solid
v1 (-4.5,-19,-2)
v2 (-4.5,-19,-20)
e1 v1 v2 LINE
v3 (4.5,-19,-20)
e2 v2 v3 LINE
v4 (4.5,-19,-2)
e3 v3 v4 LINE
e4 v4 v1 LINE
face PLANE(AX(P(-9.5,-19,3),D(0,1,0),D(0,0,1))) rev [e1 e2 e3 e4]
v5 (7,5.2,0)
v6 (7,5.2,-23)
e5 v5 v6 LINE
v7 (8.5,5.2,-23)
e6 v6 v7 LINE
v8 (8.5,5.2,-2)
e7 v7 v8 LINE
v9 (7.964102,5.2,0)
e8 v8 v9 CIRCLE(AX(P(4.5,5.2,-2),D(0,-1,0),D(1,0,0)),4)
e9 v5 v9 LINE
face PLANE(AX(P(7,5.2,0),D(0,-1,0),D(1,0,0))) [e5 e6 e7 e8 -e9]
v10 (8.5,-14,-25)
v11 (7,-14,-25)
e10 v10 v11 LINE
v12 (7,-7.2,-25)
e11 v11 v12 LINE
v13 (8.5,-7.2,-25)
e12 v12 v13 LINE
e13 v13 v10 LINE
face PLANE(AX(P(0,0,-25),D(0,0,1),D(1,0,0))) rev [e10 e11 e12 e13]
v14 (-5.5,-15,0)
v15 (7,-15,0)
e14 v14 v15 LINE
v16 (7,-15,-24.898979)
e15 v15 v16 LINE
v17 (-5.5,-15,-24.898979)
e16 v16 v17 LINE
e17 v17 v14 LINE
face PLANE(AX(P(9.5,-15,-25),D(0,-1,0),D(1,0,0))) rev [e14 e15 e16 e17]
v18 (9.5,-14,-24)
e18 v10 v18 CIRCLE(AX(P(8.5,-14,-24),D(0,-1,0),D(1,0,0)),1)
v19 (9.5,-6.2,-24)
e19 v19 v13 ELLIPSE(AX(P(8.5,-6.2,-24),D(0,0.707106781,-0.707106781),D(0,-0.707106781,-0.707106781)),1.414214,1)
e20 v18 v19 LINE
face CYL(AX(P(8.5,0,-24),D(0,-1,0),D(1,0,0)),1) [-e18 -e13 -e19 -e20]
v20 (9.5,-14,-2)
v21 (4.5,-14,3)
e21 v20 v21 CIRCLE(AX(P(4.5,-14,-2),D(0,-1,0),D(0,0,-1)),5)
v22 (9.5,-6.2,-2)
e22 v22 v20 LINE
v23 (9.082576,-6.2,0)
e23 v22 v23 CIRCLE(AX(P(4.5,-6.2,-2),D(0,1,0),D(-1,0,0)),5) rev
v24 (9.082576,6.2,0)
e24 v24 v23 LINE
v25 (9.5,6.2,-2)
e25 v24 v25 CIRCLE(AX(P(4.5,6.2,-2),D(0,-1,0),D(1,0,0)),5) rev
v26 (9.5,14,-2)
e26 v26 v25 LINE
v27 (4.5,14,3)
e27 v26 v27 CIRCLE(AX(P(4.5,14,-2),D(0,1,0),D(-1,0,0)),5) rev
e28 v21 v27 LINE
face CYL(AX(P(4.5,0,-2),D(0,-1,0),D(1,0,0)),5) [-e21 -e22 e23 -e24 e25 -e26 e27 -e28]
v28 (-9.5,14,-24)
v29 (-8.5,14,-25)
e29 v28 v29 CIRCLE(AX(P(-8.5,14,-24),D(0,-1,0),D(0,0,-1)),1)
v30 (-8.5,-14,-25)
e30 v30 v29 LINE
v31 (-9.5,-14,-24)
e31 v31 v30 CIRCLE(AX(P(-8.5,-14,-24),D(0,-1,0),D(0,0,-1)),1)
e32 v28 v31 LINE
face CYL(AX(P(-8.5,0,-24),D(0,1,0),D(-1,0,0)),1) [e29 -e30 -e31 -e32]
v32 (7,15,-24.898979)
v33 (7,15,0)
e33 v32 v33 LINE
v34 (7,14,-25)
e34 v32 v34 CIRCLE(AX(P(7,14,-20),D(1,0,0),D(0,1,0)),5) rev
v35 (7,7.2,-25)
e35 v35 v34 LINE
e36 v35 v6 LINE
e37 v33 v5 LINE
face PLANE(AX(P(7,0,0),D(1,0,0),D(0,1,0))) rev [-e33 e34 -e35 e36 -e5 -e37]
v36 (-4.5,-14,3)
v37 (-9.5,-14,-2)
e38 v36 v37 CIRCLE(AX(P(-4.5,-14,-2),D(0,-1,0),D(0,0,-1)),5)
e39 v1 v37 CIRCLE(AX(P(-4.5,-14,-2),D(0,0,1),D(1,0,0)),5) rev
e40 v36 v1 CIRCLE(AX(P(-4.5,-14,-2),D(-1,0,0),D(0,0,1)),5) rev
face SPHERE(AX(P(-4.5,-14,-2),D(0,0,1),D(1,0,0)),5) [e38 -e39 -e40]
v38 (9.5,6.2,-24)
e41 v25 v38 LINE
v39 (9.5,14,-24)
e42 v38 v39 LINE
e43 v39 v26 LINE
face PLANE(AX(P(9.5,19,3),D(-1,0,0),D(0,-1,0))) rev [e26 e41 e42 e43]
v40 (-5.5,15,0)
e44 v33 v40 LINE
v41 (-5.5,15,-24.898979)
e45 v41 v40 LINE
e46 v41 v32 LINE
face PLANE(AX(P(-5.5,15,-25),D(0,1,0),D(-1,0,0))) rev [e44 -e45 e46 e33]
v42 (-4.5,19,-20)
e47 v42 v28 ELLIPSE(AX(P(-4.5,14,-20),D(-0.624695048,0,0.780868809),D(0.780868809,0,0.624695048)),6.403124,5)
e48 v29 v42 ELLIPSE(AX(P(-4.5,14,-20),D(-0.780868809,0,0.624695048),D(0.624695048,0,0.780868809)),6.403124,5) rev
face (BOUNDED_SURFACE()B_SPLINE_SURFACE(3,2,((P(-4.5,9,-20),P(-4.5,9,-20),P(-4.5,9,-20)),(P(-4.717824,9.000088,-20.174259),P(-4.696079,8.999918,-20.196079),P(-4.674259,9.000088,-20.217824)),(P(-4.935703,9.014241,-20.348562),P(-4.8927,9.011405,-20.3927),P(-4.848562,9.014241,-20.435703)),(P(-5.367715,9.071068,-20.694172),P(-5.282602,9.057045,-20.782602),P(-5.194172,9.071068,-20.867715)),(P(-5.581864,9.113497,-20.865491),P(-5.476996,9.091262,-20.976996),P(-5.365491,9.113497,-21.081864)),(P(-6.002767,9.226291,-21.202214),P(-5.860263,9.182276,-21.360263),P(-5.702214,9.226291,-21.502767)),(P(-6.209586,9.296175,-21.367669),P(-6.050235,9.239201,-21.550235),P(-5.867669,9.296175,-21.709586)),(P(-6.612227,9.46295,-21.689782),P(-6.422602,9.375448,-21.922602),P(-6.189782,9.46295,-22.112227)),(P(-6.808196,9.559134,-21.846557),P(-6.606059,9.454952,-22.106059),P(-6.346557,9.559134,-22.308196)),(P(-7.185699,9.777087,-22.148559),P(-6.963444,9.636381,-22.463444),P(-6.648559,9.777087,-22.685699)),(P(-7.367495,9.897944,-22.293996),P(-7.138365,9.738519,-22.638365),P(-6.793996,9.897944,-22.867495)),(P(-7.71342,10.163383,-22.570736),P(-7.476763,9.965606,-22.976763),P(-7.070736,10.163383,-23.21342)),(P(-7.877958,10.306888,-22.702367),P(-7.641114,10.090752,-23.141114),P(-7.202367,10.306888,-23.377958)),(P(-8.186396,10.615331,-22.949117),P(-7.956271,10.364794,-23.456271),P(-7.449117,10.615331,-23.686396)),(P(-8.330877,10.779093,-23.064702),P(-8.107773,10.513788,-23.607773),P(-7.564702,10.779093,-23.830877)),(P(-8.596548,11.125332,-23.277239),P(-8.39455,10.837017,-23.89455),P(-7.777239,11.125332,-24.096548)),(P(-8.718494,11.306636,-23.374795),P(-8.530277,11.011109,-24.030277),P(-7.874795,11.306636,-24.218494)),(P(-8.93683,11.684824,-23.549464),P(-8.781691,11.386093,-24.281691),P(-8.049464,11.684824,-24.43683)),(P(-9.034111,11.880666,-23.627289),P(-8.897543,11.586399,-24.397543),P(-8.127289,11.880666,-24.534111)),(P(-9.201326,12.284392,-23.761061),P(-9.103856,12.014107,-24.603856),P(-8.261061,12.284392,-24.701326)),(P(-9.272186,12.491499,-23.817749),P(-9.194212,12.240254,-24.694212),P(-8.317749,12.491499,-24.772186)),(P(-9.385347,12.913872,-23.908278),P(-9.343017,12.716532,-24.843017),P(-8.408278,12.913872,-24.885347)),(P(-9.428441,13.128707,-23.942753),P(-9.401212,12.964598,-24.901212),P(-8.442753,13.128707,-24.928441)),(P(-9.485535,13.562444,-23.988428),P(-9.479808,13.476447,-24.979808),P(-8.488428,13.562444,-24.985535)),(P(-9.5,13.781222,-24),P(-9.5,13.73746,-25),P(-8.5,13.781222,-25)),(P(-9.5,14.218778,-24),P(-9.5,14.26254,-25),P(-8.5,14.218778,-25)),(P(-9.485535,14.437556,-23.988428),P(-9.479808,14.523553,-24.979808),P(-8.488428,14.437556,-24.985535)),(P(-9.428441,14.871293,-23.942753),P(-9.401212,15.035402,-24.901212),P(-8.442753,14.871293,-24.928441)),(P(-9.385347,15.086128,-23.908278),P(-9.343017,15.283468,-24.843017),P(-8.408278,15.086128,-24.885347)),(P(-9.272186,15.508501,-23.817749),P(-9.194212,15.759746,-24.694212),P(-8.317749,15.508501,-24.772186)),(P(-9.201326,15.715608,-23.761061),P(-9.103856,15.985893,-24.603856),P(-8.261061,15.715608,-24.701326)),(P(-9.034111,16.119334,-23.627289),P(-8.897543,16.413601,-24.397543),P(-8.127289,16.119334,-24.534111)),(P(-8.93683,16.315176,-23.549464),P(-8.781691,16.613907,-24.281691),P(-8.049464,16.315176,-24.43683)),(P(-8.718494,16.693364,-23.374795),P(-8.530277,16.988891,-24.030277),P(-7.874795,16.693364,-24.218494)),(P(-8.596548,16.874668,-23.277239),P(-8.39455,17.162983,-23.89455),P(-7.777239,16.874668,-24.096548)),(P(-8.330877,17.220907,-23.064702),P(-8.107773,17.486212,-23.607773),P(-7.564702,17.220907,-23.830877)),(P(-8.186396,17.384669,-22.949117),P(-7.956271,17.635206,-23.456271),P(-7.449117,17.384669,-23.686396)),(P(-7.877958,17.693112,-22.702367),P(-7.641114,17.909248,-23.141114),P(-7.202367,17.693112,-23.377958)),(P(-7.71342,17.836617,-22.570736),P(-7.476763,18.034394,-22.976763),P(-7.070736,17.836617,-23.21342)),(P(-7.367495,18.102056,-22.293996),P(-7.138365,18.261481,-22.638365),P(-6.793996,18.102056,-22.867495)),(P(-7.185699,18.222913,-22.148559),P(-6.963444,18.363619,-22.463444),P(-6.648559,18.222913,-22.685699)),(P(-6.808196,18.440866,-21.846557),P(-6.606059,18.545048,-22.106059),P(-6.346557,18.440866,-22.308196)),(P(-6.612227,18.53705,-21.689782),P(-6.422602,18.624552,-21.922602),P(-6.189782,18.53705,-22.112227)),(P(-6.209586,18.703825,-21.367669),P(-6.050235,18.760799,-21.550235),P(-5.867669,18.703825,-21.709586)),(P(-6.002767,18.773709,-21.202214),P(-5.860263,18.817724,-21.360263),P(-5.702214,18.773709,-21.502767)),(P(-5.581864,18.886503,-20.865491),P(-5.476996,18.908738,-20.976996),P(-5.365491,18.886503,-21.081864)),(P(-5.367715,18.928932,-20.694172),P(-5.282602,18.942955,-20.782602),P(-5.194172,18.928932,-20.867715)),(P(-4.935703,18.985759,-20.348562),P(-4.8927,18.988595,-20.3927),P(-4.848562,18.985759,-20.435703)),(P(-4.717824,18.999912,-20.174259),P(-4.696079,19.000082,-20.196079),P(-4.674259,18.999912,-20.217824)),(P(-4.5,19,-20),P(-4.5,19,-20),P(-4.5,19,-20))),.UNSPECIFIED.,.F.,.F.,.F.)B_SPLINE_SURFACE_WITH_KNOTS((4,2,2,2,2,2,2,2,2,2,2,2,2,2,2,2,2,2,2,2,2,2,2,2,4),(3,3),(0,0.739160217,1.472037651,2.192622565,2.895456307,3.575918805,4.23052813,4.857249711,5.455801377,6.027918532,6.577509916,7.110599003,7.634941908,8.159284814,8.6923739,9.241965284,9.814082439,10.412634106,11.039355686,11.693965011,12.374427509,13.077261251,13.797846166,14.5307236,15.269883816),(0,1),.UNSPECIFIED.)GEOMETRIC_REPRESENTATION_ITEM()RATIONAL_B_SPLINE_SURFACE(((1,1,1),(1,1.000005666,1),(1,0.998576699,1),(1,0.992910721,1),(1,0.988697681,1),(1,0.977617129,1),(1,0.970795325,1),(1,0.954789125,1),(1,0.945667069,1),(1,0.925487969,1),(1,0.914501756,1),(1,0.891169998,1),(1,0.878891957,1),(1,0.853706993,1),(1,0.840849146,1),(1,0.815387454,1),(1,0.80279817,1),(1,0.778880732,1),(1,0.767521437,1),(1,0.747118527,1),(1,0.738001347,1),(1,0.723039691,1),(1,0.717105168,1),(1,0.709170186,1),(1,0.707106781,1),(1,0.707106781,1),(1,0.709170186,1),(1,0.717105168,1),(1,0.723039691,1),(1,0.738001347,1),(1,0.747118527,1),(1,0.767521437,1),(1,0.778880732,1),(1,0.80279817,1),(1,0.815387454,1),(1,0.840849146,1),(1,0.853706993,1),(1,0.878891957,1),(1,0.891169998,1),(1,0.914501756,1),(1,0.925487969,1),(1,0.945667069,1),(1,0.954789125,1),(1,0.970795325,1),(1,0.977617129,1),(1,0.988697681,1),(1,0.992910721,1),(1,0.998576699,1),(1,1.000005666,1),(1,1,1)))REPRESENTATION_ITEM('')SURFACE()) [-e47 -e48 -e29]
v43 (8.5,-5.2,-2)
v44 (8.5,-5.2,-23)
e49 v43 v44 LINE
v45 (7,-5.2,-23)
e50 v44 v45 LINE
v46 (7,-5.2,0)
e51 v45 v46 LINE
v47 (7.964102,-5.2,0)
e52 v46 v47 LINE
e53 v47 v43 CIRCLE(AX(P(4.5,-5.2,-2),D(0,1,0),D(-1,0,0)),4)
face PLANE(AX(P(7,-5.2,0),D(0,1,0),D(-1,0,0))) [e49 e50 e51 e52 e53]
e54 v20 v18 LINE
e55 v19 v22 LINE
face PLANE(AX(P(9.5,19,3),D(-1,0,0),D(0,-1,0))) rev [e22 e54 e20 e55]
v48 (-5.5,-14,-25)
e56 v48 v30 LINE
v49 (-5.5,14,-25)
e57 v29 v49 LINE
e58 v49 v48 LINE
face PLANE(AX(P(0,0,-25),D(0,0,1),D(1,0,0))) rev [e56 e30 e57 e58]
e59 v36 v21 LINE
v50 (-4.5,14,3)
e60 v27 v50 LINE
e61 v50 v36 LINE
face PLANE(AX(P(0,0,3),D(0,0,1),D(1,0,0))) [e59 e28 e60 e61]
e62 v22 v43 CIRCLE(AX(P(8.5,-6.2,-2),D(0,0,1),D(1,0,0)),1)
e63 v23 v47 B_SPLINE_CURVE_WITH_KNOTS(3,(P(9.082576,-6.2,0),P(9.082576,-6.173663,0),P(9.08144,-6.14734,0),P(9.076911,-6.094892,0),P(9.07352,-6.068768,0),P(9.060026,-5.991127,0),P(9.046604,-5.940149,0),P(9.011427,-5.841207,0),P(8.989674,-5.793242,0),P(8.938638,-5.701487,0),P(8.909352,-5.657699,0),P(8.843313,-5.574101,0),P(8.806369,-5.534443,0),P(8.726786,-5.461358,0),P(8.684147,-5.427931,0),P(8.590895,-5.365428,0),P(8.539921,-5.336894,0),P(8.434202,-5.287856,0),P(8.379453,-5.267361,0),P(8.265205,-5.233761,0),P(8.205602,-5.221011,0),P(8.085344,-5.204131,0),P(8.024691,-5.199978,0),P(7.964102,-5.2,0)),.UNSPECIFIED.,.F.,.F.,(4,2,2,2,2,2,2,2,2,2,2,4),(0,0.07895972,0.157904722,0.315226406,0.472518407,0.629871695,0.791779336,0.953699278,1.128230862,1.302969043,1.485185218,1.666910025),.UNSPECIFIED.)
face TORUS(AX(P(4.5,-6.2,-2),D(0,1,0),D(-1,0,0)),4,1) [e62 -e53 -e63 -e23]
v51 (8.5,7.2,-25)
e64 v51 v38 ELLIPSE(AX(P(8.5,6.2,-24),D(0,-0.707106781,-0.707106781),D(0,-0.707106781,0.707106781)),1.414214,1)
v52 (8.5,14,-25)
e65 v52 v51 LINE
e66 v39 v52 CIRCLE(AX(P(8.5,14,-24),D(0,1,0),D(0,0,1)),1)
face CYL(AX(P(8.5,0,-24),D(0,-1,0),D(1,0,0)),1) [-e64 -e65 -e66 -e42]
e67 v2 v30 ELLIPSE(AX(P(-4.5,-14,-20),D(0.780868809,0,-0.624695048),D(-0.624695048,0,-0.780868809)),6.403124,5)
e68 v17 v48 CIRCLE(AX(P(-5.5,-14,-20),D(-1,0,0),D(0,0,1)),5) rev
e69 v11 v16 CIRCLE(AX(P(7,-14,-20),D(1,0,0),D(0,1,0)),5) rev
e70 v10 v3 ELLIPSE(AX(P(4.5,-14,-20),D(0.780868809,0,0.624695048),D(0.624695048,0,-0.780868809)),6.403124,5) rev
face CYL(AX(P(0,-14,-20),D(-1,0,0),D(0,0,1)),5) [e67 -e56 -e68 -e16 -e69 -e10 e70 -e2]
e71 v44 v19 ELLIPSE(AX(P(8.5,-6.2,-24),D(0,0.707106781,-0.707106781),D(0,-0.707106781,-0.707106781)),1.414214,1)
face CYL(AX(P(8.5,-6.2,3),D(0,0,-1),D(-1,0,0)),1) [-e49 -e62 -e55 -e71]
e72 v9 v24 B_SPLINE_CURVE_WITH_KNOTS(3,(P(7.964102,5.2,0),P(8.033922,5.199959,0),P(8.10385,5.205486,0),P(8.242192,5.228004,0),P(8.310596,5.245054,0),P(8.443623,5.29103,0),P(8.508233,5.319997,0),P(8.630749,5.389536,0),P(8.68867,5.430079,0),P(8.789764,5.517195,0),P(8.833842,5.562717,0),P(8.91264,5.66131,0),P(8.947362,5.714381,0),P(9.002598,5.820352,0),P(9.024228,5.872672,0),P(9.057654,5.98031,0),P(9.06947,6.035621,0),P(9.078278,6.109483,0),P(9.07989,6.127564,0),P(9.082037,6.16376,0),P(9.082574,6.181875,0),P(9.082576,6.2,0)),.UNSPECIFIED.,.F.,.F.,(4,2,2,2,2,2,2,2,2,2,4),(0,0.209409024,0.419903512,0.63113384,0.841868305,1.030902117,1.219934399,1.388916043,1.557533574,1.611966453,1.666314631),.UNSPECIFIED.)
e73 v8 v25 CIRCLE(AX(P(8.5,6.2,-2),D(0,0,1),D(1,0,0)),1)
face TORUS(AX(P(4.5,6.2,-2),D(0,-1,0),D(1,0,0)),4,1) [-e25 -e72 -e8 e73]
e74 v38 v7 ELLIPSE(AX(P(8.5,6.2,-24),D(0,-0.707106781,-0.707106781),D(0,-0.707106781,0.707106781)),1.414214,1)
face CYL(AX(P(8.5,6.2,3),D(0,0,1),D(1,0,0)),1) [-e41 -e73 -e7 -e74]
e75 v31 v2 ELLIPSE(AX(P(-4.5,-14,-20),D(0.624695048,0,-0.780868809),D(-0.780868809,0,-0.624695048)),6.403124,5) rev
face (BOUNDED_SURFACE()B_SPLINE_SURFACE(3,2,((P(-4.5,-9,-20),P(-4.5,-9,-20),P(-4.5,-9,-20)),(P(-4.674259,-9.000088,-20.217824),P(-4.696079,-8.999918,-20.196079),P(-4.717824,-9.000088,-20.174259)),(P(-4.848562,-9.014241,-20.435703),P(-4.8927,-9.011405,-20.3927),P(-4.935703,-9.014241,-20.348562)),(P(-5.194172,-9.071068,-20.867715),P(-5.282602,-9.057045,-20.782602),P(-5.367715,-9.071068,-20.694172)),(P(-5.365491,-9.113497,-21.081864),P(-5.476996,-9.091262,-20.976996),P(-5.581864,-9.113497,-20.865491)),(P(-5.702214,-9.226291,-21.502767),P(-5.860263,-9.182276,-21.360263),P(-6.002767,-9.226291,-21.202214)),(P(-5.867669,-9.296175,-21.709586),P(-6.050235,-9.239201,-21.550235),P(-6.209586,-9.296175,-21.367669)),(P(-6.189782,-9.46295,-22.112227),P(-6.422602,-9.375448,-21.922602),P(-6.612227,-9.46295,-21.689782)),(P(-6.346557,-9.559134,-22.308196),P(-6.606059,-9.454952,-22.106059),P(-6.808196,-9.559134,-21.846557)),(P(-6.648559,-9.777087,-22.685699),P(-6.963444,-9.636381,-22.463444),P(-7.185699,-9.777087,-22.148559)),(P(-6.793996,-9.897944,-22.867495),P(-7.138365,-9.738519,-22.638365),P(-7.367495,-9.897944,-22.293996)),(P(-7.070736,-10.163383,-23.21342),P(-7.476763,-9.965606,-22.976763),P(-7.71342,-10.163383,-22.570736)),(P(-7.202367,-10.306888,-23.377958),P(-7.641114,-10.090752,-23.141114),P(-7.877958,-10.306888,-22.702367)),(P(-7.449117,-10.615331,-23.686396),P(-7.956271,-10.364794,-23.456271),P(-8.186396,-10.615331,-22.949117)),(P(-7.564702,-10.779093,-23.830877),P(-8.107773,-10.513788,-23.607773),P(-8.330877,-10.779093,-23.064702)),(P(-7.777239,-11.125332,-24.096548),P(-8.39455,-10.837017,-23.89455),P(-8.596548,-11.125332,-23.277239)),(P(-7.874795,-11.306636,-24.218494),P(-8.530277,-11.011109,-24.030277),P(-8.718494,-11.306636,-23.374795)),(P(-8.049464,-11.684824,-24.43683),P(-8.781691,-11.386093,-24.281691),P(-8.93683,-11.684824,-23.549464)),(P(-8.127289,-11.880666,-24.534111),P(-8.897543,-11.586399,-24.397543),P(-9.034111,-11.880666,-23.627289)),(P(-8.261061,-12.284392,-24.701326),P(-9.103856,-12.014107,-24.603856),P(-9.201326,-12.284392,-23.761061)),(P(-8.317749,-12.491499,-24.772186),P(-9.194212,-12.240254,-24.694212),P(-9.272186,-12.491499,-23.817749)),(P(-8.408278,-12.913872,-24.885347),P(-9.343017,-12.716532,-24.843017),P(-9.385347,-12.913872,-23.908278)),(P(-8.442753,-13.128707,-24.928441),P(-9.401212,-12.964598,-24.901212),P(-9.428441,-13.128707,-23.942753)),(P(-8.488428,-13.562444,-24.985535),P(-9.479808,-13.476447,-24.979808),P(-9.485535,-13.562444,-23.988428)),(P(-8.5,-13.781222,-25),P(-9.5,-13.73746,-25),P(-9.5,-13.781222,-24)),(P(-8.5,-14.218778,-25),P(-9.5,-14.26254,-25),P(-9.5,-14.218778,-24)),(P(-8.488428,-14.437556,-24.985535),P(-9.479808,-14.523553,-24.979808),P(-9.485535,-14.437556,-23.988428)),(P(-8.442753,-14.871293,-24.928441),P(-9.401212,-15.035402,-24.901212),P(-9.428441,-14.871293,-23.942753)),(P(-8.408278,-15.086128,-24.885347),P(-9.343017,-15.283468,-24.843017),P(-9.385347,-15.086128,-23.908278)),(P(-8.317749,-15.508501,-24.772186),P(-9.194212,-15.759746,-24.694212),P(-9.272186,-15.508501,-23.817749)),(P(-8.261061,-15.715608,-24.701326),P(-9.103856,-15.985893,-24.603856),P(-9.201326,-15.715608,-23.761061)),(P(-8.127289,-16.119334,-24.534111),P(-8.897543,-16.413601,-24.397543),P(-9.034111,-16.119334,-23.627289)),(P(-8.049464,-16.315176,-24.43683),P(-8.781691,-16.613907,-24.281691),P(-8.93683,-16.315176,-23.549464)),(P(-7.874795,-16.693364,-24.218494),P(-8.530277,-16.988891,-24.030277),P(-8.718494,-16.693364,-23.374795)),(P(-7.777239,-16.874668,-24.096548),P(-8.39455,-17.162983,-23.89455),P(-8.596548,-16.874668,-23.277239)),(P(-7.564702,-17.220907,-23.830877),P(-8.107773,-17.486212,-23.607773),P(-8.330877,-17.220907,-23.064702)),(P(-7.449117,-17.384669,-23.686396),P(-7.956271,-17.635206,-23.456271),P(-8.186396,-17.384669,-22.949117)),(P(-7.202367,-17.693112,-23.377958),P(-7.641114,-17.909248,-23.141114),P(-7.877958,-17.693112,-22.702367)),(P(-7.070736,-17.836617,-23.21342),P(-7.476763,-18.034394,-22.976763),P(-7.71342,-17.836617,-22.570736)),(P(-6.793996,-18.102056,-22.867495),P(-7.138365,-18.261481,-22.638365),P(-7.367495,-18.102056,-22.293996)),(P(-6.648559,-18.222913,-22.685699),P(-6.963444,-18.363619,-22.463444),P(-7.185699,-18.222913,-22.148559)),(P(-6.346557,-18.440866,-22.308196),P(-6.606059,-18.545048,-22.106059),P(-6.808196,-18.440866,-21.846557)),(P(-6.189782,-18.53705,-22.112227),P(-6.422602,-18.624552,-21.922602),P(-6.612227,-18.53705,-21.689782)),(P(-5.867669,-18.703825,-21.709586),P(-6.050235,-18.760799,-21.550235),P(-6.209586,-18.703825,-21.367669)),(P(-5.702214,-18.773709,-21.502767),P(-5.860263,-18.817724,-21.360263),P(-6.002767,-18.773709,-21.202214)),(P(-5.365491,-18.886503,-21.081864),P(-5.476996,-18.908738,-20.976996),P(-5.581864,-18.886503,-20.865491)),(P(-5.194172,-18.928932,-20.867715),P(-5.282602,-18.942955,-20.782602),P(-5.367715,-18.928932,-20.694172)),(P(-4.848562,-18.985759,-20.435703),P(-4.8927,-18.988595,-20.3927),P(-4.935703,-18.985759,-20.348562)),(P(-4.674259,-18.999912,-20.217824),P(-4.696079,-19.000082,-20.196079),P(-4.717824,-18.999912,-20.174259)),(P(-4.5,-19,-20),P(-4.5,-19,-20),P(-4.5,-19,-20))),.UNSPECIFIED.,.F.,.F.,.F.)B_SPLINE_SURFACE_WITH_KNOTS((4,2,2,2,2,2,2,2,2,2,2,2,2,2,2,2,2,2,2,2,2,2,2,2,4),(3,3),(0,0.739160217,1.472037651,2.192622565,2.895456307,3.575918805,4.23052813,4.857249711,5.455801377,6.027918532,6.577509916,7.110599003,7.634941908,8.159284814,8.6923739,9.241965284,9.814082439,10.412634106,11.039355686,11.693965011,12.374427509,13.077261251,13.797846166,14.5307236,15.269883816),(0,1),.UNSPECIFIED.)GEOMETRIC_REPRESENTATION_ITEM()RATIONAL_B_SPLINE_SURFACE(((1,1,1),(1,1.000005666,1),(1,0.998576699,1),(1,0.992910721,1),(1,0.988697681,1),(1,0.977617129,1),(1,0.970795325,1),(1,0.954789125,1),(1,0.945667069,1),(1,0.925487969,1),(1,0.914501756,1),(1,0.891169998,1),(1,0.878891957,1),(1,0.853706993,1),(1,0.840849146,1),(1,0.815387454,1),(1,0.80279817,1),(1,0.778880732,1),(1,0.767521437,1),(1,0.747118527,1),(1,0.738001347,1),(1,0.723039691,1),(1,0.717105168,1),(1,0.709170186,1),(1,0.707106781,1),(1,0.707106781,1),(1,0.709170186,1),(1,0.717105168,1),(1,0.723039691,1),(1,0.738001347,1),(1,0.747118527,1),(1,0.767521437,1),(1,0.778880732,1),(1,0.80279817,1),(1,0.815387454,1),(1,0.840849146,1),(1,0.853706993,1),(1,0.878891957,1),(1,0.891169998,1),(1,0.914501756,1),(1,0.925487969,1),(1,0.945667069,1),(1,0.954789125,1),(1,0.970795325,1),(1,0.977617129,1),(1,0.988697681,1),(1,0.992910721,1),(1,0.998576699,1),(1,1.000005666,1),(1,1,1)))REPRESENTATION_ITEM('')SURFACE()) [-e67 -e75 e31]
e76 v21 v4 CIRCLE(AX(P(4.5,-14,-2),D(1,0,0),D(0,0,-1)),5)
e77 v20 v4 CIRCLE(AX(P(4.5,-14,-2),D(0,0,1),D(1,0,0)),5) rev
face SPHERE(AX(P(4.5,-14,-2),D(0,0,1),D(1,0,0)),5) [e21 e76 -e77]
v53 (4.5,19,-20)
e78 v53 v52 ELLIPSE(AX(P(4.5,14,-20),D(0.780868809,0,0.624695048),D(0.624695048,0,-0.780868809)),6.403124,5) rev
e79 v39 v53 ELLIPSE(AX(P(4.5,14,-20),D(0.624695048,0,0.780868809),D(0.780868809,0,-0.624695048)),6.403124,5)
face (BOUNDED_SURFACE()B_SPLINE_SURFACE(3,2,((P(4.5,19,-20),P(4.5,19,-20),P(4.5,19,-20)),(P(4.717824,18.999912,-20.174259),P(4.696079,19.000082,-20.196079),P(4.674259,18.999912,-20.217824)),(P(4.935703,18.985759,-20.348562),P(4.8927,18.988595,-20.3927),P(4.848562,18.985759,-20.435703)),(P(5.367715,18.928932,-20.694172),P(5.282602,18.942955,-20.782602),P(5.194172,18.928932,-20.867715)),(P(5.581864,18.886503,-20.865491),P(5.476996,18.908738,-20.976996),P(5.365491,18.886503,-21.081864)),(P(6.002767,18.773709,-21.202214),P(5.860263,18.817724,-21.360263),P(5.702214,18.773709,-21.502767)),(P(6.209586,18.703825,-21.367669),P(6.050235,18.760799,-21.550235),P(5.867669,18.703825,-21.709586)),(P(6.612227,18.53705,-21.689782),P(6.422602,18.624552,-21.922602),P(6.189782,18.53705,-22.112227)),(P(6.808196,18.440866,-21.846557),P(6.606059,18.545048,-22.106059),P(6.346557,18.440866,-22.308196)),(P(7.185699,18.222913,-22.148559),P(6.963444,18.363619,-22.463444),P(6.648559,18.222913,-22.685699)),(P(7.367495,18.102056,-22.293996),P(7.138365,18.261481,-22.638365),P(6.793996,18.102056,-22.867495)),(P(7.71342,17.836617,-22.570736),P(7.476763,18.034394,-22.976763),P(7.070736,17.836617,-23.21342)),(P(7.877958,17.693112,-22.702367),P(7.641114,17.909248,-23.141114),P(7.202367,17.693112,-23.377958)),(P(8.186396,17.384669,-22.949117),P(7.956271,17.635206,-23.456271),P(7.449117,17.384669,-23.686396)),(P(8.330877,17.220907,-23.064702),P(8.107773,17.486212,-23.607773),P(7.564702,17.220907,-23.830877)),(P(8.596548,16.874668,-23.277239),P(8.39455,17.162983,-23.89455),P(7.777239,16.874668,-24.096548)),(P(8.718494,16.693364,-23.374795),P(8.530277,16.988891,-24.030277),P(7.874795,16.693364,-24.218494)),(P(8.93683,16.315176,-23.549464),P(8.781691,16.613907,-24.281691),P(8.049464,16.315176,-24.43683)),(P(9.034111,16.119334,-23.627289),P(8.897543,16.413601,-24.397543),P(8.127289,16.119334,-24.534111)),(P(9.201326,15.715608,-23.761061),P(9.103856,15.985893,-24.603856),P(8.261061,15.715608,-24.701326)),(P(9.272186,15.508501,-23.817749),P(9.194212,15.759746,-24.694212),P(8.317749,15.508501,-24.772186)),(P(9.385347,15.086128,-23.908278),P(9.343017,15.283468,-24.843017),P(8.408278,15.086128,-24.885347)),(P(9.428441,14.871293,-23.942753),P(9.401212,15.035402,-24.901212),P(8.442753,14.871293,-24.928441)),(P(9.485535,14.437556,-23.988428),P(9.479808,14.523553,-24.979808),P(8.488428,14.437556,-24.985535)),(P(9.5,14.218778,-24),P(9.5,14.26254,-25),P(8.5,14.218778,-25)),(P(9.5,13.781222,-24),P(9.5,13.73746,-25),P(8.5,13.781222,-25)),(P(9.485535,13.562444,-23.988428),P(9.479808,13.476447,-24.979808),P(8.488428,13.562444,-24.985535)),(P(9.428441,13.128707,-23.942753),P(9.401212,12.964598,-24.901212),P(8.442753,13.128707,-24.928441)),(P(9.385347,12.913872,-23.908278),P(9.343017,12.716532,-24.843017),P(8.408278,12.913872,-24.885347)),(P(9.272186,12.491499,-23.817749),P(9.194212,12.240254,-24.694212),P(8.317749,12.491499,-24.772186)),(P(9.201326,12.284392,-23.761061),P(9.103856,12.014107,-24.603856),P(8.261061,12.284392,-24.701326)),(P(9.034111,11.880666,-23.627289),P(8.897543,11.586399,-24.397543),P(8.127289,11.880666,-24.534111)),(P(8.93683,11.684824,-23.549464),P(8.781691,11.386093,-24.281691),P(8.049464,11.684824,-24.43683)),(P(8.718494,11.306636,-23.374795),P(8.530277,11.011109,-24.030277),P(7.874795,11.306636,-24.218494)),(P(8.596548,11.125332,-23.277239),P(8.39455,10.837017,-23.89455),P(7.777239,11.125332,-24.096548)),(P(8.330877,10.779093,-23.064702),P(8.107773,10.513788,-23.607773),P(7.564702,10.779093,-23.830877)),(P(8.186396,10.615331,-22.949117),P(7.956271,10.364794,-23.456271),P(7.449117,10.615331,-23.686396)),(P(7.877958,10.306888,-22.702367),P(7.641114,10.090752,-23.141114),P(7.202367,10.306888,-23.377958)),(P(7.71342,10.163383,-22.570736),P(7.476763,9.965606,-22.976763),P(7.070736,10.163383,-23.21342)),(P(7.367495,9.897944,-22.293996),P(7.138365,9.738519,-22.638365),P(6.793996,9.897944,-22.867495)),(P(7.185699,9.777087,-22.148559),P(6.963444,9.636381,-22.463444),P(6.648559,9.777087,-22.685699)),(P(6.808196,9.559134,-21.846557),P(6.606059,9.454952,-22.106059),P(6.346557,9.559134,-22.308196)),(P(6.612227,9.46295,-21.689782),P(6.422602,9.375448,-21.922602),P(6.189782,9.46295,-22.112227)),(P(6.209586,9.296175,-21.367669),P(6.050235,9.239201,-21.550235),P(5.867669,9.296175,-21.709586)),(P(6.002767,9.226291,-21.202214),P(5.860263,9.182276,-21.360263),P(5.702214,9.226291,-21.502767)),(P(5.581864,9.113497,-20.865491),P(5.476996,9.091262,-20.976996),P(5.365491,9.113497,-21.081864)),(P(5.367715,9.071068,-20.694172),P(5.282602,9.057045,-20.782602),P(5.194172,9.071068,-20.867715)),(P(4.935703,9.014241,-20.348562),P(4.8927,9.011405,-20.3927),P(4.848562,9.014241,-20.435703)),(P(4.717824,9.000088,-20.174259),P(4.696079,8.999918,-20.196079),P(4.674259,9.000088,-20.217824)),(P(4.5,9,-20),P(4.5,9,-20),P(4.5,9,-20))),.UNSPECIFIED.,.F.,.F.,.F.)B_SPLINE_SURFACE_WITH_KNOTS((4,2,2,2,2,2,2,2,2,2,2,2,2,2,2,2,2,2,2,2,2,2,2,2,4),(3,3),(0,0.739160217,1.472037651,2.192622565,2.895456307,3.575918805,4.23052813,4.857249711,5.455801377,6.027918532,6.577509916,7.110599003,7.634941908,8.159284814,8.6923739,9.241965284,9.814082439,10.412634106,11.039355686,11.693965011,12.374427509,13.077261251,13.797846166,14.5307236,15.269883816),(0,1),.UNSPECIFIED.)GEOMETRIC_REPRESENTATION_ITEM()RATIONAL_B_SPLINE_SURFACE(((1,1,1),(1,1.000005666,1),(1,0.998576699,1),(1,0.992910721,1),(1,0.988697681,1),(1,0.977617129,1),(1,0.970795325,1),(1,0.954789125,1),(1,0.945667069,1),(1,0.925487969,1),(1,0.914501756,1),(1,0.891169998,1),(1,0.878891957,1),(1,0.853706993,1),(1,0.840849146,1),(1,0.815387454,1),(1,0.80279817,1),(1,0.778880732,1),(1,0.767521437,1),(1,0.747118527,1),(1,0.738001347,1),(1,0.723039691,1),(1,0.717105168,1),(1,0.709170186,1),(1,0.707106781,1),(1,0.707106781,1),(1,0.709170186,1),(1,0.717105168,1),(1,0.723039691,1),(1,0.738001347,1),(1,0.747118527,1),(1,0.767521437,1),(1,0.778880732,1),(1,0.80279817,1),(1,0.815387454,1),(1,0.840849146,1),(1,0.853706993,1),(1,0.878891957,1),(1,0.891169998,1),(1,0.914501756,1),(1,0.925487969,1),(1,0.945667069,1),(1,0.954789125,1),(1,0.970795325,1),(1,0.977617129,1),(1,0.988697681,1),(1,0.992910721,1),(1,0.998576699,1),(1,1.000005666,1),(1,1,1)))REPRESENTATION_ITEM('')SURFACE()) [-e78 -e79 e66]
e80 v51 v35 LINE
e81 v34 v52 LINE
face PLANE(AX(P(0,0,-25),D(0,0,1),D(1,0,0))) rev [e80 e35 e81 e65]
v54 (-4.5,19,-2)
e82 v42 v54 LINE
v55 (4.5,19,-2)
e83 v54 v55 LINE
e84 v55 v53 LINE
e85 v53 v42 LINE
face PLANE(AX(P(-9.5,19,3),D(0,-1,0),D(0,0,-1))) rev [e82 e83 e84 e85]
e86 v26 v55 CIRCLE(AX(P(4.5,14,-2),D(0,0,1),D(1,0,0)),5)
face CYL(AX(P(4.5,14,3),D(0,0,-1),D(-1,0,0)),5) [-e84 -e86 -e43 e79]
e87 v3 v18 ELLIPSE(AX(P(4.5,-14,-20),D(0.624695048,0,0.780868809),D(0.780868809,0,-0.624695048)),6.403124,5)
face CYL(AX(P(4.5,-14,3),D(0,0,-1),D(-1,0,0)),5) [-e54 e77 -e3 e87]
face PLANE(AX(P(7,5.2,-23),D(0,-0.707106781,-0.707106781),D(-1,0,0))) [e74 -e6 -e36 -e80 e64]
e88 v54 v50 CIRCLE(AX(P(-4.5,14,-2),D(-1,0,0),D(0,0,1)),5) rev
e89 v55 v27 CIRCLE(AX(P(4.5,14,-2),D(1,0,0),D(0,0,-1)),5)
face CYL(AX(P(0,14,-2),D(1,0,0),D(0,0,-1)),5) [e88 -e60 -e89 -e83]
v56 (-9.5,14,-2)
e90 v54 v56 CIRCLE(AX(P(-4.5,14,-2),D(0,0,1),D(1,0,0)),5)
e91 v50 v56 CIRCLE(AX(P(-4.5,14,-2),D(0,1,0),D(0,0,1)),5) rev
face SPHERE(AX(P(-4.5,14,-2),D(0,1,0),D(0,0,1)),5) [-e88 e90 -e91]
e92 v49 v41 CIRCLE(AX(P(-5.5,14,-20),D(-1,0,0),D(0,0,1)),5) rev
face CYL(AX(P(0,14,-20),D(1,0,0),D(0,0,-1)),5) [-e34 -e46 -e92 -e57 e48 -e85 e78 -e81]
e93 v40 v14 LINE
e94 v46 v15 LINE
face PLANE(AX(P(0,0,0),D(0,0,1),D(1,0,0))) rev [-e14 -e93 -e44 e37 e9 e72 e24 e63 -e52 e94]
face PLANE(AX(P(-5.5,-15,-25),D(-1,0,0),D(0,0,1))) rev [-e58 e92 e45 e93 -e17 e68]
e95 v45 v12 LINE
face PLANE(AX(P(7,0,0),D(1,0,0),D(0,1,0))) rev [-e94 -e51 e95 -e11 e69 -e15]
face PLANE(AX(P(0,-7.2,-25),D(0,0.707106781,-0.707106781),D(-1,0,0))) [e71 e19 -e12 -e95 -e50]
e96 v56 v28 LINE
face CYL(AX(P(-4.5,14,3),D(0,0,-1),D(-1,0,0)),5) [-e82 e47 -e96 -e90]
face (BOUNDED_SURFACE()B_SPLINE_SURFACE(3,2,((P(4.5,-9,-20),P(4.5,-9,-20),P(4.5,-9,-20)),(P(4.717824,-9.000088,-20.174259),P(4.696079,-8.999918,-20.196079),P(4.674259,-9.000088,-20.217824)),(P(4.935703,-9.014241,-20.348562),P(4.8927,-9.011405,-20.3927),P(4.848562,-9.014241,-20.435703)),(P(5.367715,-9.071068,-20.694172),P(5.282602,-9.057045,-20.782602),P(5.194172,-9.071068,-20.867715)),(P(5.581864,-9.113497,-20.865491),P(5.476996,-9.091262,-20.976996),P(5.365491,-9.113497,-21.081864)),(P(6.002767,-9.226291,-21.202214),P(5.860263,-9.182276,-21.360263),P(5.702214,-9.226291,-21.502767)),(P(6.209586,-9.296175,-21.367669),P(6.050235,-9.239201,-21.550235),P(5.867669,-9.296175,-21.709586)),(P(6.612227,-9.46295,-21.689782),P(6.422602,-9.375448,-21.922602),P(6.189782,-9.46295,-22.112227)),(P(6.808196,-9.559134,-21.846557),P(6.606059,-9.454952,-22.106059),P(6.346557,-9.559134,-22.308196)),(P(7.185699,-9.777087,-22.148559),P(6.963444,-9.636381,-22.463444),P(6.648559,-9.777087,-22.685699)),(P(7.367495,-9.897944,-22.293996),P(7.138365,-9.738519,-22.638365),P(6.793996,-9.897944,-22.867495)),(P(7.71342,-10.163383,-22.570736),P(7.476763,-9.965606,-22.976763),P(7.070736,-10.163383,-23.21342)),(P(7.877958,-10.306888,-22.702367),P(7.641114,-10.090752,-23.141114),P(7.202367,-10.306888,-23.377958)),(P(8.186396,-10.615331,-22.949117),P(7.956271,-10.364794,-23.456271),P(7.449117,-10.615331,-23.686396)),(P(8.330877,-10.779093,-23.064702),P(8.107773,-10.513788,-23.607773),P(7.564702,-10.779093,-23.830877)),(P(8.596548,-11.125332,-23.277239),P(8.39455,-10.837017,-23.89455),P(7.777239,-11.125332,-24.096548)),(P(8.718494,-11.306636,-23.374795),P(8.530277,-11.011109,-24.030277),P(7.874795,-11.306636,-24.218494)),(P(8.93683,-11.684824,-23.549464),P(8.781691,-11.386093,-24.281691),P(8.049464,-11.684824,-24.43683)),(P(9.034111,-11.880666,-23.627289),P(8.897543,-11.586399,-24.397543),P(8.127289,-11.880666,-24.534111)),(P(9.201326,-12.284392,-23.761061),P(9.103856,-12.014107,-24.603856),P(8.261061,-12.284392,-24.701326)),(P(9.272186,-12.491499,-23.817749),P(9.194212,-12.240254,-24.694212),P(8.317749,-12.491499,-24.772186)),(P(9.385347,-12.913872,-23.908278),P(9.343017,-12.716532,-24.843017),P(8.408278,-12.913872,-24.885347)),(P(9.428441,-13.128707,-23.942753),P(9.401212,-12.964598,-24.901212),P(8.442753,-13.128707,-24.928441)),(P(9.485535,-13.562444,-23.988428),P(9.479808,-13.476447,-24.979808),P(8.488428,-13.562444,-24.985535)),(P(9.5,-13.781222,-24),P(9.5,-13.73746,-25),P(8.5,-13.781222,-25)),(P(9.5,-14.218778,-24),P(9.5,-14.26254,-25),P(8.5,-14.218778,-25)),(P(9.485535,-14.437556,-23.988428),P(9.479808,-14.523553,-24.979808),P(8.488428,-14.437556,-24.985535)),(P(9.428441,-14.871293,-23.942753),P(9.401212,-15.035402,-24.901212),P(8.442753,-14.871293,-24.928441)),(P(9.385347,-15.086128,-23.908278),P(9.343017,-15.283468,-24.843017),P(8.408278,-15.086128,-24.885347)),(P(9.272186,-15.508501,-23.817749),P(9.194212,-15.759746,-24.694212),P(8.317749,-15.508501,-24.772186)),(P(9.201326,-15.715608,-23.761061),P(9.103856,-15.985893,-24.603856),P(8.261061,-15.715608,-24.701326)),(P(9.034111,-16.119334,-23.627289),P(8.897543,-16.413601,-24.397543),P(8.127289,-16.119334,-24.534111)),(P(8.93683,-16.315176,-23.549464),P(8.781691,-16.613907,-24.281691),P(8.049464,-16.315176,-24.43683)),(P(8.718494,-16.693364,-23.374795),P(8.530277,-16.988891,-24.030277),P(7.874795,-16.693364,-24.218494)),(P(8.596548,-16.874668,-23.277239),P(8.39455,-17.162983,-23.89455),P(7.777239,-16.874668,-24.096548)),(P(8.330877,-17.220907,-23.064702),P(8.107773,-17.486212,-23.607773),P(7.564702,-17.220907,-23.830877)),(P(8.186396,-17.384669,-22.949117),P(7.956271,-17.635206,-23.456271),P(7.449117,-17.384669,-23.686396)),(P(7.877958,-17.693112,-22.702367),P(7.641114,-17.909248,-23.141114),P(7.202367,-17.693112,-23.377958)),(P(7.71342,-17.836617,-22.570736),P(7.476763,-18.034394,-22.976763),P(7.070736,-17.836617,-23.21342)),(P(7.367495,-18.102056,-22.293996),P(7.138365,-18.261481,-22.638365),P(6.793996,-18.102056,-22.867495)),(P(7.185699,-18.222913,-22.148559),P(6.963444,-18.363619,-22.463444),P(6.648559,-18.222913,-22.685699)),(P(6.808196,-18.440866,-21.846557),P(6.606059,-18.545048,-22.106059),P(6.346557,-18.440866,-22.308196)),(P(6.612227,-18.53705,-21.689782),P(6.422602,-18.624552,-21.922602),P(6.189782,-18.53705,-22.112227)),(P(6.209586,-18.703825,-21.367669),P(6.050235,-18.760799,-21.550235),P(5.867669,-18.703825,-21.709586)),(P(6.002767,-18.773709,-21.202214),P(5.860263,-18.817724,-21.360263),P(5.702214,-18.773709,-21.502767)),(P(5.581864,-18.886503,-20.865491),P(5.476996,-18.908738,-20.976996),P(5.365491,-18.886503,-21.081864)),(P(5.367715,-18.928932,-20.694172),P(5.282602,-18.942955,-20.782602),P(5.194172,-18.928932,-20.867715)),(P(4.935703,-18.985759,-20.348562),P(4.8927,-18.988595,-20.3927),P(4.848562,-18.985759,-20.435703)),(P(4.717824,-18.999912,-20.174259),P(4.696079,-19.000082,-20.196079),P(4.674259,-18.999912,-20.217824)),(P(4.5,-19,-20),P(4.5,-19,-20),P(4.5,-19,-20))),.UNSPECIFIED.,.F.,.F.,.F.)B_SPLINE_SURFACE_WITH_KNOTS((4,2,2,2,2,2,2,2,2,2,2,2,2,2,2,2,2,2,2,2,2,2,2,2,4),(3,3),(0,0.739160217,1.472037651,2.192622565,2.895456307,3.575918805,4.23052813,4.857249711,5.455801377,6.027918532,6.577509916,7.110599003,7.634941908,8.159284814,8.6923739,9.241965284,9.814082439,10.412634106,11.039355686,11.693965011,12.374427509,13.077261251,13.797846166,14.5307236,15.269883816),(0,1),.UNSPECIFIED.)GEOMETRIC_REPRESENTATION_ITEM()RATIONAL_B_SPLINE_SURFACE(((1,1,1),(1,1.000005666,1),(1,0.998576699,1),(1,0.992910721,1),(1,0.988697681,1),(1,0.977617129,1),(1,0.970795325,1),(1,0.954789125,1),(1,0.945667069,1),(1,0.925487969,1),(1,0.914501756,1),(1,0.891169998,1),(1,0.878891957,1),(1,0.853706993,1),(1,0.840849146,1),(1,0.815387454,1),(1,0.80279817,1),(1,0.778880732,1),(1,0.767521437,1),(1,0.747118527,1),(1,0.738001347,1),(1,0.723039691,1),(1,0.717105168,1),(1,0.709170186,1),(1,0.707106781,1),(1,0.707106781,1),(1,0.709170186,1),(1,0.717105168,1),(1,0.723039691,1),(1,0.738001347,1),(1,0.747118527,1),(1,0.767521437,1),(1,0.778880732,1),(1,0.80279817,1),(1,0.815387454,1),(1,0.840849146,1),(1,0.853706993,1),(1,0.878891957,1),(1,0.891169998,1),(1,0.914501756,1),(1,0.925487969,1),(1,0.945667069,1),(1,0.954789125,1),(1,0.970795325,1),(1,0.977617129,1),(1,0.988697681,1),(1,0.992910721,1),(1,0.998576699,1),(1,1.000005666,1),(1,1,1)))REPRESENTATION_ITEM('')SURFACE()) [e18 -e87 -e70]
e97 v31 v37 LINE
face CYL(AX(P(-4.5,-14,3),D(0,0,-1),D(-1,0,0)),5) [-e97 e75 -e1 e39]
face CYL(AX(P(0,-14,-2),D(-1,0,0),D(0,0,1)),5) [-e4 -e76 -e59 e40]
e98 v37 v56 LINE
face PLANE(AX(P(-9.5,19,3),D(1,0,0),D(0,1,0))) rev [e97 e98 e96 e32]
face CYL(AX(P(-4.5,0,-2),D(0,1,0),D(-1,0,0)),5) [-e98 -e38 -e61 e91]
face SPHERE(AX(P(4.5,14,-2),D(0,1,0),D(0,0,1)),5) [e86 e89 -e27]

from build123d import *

# Parameters (mm, degrees)
SKETCH_1_W      = 19
SKETCH_1_H      = 38
EXTRUDE_1_DEPTH = 3
EXTRUDE_2_DEPTH = 25
SKETCH_5_W      = 25
SKETCH_5_H      = 9.8
EXTRUDE_3_DEPTH = 2.5
CHAMFER_1_SIZE  = 2
FILLET_2_R      = 5
FILLET_3_R      = 1
FILLET_4_R      = 1


# Some blends are built 0.0001 mm under size
with BuildPart() as part:
    # 草图1 → 凸台-拉伸1 (new body)
    with BuildSketch(Plane.XY):
        Rectangle(SKETCH_1_W, SKETCH_1_H)
    extrude(amount=EXTRUDE_1_DEPTH)

    # 草图2 → 凸台-拉伸2 (add)
    with BuildSketch(Plane(origin=(0, 0, 0), x_dir=(-1, 0, 0), z_dir=(0, 0, -1))):
        Polygon((-9.5, 19), (9.5, 19), (9.5, -19), (-9.5, -19), (-9.5, -15), (5.5, -15), (5.5, 15), (-9.5, 15), align=None)
    extrude(amount=EXTRUDE_2_DEPTH)

    # 草图5 → 凸台-拉伸3 (add)
    with BuildSketch(Plane(origin=(9.5, 0, 0), x_dir=(0, 0, -1), z_dir=(1, 0, 0))):
        with Locations((12.5, 10.1)):
            Rectangle(SKETCH_5_W, SKETCH_5_H)
        with Locations((12.5, -10.1)):
            Rectangle(SKETCH_5_W, SKETCH_5_H)
    extrude(amount=-EXTRUDE_3_DEPTH)

    # 倒角1
    chamfer_1_edges = [part.edges().sort_by_distance(p)[0] for p in [
        (8.25, 5.2, -25),
        (8.25, -5.2, -25),
    ]]
    chamfer(chamfer_1_edges, length=CHAMFER_1_SIZE)

    # 圆角2
    # the kernel refuses this fillet: 5 mm, written as the material it takes off along each edge
    with BuildSketch(Plane(origin=(4.5, -14, -2), x_dir=(0, -1, 0), z_dir=(1, 0, 0))) as fillet_2_piece_1_section:
        Polygon((0, 0), (FILLET_2_R, 0), (FILLET_2_R, -FILLET_2_R), (0, -FILLET_2_R), align=None)
    fillet_2_piece_1 = extrude(amount=FILLET_2_R, mode=Mode.PRIVATE)
    fillet_2_piece_1 = fillet_2_piece_1 - Plane(origin=(4.5, -14, -2), x_dir=(0, 0.7071067811865475, -0.7071067811865475), z_dir=(1, 0, 0)) * Sphere(FILLET_2_R, mode=Mode.PRIVATE)
    add(fillet_2_piece_1, mode=Mode.SUBTRACT)
    with BuildSketch(Plane(origin=(-4.5, -14, -2), x_dir=(0, -1, 0), z_dir=(-1, 0, 0))) as fillet_2_piece_2_section:
        Polygon((0, 0), (FILLET_2_R, 0), (FILLET_2_R, FILLET_2_R), (0, FILLET_2_R), align=None)
    fillet_2_piece_2 = extrude(amount=FILLET_2_R, mode=Mode.PRIVATE)
    fillet_2_piece_2 = fillet_2_piece_2 - Plane(origin=(-4.5, -14, -2), x_dir=(0, 0.7071067811865475, -0.7071067811865475), z_dir=(-1, 0, 0)) * Sphere(FILLET_2_R, mode=Mode.PRIVATE)
    add(fillet_2_piece_2, mode=Mode.SUBTRACT)
    with BuildSketch(Plane(origin=(-4.5, 14, -2), x_dir=(-1, 0, 0), z_dir=(0, 0, 1))) as fillet_2_piece_3_section:
        Polygon((0, 0), (FILLET_2_R, 0), (FILLET_2_R, -FILLET_2_R), (0, -FILLET_2_R), align=None)
    fillet_2_piece_3 = extrude(amount=FILLET_2_R, mode=Mode.PRIVATE)
    fillet_2_piece_3 = fillet_2_piece_3 - Plane(origin=(-4.5, 14, -2), x_dir=(0.7071067811865476, -0.7071067811865475, 0), z_dir=(0, 0, 1)) * Sphere(FILLET_2_R, mode=Mode.PRIVATE)
    add(fillet_2_piece_3, mode=Mode.SUBTRACT)
    with BuildSketch(Plane(origin=(4.5, 14, -2), x_dir=(0, 0, 1), z_dir=(1, 0, 0))) as fillet_2_piece_4_section:
        Polygon((0, 0), (FILLET_2_R, 0), (FILLET_2_R, -FILLET_2_R), (0, -FILLET_2_R), align=None)
    fillet_2_piece_4 = extrude(amount=FILLET_2_R, mode=Mode.PRIVATE)
    fillet_2_piece_4 = fillet_2_piece_4 - Plane(origin=(4.5, 14, -2), x_dir=(0, -0.7071067811865475, -0.7071067811865475), z_dir=(1, 0, 0)) * Sphere(FILLET_2_R, mode=Mode.PRIVATE)
    add(fillet_2_piece_4, mode=Mode.SUBTRACT)
    with BuildSketch(Plane(origin=(9.5, -19, -2), x_dir=(0, 1, 0), z_dir=(0, 0, -1))) as fillet_2_piece_5:
        with BuildLine():
            CenterArc((FILLET_2_R, -FILLET_2_R), FILLET_2_R, 90, 90)
            Line((0, -FILLET_2_R), (0, 0))
            Line((0, 0), (FILLET_2_R, 0))
        make_face()
    extrude(amount=35.5, mode=Mode.SUBTRACT)
    with BuildSketch(Plane(origin=(-22, -19, -25), x_dir=(0, 1, 0), z_dir=(1, 0, 0)), Plane(origin=(22, 19, -25), x_dir=(0, -1, 0), z_dir=(-1, 0, 0))) as fillet_2_piece_6:
        with BuildLine():
            CenterArc((FILLET_2_R, FILLET_2_R), FILLET_2_R, 180, 90)
            Line((0, FILLET_2_R), (0, 0))
            Line((0, 0), (FILLET_2_R, 0))
        make_face()
    extrude(amount=44, mode=Mode.SUBTRACT)
    with BuildSketch(Plane(origin=(4.5, -19, 3), x_dir=(0, 0, -1), z_dir=(-1, 0, 0)), Plane(origin=(-4.5, 19, 3), x_dir=(0, 0, -1), z_dir=(1, 0, 0))) as fillet_2_piece_7:
        with BuildLine():
            CenterArc((FILLET_2_R, -FILLET_2_R), FILLET_2_R, 90, 90)
            Line((0, -FILLET_2_R), (0, 0))
            Line((0, 0), (FILLET_2_R, 0))
        make_face()
    extrude(amount=9, mode=Mode.SUBTRACT)
    with BuildSketch(Plane(origin=(-9.5, -19, -37.5), x_dir=(1, 0, 0), z_dir=(0, 0, 1)), Plane(origin=(-9.5, 19, -37.5), x_dir=(0, -1, 0), z_dir=(0, 0, 1)), Plane(origin=(9.5, 19, -2), x_dir=(0, -1, 0), z_dir=(0, 0, -1))) as fillet_2_piece_8:
        with BuildLine():
            CenterArc((FILLET_2_R, FILLET_2_R), FILLET_2_R, 180, 90)
            Line((0, FILLET_2_R), (0, 0))
            Line((0, 0), (FILLET_2_R, 0))
        make_face()
    extrude(amount=35.5, mode=Mode.SUBTRACT)
    with BuildSketch(Plane(origin=(-9.5, -14, 3), x_dir=(0, 0, -1), z_dir=(0, 1, 0)), Plane(origin=(9.5, 14, 3), x_dir=(0, 0, -1), z_dir=(0, -1, 0))) as fillet_2_piece_9:
        with BuildLine():
            CenterArc((FILLET_2_R, -FILLET_2_R), FILLET_2_R, 90, 90)
            Line((0, -FILLET_2_R), (0, 0))
            Line((0, 0), (FILLET_2_R, 0))
        make_face()
    extrude(amount=28, mode=Mode.SUBTRACT)

    # 圆角3
    fillet_3_edges = [part.edges().sort_by_distance(p)[0] for p in [
        (-7.730244537, 17.816480084, -23.230244537),
        (-7.730244537, -17.816480084, -23.230244537),
        (-9.5, 0, -25),
    ]]
    fillet(fillet_3_edges, radius=FILLET_3_R)

    # 圆角4
    fillet_4_edges = [part.edges().sort_by_distance(p)[0] for p in [
        (9.394531565, 5.2, -0.978451782),
        (9.394531565, -5.2, -0.978451782),
        (8.035533906, 17.535533906, -23.535533906),
        (8.035533906, -17.535533906, -23.535533906),
        (9.5, -10.6, -25),
        (9.5, -5.2, -12.5),
        (9.5, 5.2, -12.5),
        (9.5, 10.6, -25),
    ]]
    fillet(fillet_4_edges, radius=FILLET_4_R - 0.0001)  # a hair under: the kernel refuses the full size


solid = part.part
